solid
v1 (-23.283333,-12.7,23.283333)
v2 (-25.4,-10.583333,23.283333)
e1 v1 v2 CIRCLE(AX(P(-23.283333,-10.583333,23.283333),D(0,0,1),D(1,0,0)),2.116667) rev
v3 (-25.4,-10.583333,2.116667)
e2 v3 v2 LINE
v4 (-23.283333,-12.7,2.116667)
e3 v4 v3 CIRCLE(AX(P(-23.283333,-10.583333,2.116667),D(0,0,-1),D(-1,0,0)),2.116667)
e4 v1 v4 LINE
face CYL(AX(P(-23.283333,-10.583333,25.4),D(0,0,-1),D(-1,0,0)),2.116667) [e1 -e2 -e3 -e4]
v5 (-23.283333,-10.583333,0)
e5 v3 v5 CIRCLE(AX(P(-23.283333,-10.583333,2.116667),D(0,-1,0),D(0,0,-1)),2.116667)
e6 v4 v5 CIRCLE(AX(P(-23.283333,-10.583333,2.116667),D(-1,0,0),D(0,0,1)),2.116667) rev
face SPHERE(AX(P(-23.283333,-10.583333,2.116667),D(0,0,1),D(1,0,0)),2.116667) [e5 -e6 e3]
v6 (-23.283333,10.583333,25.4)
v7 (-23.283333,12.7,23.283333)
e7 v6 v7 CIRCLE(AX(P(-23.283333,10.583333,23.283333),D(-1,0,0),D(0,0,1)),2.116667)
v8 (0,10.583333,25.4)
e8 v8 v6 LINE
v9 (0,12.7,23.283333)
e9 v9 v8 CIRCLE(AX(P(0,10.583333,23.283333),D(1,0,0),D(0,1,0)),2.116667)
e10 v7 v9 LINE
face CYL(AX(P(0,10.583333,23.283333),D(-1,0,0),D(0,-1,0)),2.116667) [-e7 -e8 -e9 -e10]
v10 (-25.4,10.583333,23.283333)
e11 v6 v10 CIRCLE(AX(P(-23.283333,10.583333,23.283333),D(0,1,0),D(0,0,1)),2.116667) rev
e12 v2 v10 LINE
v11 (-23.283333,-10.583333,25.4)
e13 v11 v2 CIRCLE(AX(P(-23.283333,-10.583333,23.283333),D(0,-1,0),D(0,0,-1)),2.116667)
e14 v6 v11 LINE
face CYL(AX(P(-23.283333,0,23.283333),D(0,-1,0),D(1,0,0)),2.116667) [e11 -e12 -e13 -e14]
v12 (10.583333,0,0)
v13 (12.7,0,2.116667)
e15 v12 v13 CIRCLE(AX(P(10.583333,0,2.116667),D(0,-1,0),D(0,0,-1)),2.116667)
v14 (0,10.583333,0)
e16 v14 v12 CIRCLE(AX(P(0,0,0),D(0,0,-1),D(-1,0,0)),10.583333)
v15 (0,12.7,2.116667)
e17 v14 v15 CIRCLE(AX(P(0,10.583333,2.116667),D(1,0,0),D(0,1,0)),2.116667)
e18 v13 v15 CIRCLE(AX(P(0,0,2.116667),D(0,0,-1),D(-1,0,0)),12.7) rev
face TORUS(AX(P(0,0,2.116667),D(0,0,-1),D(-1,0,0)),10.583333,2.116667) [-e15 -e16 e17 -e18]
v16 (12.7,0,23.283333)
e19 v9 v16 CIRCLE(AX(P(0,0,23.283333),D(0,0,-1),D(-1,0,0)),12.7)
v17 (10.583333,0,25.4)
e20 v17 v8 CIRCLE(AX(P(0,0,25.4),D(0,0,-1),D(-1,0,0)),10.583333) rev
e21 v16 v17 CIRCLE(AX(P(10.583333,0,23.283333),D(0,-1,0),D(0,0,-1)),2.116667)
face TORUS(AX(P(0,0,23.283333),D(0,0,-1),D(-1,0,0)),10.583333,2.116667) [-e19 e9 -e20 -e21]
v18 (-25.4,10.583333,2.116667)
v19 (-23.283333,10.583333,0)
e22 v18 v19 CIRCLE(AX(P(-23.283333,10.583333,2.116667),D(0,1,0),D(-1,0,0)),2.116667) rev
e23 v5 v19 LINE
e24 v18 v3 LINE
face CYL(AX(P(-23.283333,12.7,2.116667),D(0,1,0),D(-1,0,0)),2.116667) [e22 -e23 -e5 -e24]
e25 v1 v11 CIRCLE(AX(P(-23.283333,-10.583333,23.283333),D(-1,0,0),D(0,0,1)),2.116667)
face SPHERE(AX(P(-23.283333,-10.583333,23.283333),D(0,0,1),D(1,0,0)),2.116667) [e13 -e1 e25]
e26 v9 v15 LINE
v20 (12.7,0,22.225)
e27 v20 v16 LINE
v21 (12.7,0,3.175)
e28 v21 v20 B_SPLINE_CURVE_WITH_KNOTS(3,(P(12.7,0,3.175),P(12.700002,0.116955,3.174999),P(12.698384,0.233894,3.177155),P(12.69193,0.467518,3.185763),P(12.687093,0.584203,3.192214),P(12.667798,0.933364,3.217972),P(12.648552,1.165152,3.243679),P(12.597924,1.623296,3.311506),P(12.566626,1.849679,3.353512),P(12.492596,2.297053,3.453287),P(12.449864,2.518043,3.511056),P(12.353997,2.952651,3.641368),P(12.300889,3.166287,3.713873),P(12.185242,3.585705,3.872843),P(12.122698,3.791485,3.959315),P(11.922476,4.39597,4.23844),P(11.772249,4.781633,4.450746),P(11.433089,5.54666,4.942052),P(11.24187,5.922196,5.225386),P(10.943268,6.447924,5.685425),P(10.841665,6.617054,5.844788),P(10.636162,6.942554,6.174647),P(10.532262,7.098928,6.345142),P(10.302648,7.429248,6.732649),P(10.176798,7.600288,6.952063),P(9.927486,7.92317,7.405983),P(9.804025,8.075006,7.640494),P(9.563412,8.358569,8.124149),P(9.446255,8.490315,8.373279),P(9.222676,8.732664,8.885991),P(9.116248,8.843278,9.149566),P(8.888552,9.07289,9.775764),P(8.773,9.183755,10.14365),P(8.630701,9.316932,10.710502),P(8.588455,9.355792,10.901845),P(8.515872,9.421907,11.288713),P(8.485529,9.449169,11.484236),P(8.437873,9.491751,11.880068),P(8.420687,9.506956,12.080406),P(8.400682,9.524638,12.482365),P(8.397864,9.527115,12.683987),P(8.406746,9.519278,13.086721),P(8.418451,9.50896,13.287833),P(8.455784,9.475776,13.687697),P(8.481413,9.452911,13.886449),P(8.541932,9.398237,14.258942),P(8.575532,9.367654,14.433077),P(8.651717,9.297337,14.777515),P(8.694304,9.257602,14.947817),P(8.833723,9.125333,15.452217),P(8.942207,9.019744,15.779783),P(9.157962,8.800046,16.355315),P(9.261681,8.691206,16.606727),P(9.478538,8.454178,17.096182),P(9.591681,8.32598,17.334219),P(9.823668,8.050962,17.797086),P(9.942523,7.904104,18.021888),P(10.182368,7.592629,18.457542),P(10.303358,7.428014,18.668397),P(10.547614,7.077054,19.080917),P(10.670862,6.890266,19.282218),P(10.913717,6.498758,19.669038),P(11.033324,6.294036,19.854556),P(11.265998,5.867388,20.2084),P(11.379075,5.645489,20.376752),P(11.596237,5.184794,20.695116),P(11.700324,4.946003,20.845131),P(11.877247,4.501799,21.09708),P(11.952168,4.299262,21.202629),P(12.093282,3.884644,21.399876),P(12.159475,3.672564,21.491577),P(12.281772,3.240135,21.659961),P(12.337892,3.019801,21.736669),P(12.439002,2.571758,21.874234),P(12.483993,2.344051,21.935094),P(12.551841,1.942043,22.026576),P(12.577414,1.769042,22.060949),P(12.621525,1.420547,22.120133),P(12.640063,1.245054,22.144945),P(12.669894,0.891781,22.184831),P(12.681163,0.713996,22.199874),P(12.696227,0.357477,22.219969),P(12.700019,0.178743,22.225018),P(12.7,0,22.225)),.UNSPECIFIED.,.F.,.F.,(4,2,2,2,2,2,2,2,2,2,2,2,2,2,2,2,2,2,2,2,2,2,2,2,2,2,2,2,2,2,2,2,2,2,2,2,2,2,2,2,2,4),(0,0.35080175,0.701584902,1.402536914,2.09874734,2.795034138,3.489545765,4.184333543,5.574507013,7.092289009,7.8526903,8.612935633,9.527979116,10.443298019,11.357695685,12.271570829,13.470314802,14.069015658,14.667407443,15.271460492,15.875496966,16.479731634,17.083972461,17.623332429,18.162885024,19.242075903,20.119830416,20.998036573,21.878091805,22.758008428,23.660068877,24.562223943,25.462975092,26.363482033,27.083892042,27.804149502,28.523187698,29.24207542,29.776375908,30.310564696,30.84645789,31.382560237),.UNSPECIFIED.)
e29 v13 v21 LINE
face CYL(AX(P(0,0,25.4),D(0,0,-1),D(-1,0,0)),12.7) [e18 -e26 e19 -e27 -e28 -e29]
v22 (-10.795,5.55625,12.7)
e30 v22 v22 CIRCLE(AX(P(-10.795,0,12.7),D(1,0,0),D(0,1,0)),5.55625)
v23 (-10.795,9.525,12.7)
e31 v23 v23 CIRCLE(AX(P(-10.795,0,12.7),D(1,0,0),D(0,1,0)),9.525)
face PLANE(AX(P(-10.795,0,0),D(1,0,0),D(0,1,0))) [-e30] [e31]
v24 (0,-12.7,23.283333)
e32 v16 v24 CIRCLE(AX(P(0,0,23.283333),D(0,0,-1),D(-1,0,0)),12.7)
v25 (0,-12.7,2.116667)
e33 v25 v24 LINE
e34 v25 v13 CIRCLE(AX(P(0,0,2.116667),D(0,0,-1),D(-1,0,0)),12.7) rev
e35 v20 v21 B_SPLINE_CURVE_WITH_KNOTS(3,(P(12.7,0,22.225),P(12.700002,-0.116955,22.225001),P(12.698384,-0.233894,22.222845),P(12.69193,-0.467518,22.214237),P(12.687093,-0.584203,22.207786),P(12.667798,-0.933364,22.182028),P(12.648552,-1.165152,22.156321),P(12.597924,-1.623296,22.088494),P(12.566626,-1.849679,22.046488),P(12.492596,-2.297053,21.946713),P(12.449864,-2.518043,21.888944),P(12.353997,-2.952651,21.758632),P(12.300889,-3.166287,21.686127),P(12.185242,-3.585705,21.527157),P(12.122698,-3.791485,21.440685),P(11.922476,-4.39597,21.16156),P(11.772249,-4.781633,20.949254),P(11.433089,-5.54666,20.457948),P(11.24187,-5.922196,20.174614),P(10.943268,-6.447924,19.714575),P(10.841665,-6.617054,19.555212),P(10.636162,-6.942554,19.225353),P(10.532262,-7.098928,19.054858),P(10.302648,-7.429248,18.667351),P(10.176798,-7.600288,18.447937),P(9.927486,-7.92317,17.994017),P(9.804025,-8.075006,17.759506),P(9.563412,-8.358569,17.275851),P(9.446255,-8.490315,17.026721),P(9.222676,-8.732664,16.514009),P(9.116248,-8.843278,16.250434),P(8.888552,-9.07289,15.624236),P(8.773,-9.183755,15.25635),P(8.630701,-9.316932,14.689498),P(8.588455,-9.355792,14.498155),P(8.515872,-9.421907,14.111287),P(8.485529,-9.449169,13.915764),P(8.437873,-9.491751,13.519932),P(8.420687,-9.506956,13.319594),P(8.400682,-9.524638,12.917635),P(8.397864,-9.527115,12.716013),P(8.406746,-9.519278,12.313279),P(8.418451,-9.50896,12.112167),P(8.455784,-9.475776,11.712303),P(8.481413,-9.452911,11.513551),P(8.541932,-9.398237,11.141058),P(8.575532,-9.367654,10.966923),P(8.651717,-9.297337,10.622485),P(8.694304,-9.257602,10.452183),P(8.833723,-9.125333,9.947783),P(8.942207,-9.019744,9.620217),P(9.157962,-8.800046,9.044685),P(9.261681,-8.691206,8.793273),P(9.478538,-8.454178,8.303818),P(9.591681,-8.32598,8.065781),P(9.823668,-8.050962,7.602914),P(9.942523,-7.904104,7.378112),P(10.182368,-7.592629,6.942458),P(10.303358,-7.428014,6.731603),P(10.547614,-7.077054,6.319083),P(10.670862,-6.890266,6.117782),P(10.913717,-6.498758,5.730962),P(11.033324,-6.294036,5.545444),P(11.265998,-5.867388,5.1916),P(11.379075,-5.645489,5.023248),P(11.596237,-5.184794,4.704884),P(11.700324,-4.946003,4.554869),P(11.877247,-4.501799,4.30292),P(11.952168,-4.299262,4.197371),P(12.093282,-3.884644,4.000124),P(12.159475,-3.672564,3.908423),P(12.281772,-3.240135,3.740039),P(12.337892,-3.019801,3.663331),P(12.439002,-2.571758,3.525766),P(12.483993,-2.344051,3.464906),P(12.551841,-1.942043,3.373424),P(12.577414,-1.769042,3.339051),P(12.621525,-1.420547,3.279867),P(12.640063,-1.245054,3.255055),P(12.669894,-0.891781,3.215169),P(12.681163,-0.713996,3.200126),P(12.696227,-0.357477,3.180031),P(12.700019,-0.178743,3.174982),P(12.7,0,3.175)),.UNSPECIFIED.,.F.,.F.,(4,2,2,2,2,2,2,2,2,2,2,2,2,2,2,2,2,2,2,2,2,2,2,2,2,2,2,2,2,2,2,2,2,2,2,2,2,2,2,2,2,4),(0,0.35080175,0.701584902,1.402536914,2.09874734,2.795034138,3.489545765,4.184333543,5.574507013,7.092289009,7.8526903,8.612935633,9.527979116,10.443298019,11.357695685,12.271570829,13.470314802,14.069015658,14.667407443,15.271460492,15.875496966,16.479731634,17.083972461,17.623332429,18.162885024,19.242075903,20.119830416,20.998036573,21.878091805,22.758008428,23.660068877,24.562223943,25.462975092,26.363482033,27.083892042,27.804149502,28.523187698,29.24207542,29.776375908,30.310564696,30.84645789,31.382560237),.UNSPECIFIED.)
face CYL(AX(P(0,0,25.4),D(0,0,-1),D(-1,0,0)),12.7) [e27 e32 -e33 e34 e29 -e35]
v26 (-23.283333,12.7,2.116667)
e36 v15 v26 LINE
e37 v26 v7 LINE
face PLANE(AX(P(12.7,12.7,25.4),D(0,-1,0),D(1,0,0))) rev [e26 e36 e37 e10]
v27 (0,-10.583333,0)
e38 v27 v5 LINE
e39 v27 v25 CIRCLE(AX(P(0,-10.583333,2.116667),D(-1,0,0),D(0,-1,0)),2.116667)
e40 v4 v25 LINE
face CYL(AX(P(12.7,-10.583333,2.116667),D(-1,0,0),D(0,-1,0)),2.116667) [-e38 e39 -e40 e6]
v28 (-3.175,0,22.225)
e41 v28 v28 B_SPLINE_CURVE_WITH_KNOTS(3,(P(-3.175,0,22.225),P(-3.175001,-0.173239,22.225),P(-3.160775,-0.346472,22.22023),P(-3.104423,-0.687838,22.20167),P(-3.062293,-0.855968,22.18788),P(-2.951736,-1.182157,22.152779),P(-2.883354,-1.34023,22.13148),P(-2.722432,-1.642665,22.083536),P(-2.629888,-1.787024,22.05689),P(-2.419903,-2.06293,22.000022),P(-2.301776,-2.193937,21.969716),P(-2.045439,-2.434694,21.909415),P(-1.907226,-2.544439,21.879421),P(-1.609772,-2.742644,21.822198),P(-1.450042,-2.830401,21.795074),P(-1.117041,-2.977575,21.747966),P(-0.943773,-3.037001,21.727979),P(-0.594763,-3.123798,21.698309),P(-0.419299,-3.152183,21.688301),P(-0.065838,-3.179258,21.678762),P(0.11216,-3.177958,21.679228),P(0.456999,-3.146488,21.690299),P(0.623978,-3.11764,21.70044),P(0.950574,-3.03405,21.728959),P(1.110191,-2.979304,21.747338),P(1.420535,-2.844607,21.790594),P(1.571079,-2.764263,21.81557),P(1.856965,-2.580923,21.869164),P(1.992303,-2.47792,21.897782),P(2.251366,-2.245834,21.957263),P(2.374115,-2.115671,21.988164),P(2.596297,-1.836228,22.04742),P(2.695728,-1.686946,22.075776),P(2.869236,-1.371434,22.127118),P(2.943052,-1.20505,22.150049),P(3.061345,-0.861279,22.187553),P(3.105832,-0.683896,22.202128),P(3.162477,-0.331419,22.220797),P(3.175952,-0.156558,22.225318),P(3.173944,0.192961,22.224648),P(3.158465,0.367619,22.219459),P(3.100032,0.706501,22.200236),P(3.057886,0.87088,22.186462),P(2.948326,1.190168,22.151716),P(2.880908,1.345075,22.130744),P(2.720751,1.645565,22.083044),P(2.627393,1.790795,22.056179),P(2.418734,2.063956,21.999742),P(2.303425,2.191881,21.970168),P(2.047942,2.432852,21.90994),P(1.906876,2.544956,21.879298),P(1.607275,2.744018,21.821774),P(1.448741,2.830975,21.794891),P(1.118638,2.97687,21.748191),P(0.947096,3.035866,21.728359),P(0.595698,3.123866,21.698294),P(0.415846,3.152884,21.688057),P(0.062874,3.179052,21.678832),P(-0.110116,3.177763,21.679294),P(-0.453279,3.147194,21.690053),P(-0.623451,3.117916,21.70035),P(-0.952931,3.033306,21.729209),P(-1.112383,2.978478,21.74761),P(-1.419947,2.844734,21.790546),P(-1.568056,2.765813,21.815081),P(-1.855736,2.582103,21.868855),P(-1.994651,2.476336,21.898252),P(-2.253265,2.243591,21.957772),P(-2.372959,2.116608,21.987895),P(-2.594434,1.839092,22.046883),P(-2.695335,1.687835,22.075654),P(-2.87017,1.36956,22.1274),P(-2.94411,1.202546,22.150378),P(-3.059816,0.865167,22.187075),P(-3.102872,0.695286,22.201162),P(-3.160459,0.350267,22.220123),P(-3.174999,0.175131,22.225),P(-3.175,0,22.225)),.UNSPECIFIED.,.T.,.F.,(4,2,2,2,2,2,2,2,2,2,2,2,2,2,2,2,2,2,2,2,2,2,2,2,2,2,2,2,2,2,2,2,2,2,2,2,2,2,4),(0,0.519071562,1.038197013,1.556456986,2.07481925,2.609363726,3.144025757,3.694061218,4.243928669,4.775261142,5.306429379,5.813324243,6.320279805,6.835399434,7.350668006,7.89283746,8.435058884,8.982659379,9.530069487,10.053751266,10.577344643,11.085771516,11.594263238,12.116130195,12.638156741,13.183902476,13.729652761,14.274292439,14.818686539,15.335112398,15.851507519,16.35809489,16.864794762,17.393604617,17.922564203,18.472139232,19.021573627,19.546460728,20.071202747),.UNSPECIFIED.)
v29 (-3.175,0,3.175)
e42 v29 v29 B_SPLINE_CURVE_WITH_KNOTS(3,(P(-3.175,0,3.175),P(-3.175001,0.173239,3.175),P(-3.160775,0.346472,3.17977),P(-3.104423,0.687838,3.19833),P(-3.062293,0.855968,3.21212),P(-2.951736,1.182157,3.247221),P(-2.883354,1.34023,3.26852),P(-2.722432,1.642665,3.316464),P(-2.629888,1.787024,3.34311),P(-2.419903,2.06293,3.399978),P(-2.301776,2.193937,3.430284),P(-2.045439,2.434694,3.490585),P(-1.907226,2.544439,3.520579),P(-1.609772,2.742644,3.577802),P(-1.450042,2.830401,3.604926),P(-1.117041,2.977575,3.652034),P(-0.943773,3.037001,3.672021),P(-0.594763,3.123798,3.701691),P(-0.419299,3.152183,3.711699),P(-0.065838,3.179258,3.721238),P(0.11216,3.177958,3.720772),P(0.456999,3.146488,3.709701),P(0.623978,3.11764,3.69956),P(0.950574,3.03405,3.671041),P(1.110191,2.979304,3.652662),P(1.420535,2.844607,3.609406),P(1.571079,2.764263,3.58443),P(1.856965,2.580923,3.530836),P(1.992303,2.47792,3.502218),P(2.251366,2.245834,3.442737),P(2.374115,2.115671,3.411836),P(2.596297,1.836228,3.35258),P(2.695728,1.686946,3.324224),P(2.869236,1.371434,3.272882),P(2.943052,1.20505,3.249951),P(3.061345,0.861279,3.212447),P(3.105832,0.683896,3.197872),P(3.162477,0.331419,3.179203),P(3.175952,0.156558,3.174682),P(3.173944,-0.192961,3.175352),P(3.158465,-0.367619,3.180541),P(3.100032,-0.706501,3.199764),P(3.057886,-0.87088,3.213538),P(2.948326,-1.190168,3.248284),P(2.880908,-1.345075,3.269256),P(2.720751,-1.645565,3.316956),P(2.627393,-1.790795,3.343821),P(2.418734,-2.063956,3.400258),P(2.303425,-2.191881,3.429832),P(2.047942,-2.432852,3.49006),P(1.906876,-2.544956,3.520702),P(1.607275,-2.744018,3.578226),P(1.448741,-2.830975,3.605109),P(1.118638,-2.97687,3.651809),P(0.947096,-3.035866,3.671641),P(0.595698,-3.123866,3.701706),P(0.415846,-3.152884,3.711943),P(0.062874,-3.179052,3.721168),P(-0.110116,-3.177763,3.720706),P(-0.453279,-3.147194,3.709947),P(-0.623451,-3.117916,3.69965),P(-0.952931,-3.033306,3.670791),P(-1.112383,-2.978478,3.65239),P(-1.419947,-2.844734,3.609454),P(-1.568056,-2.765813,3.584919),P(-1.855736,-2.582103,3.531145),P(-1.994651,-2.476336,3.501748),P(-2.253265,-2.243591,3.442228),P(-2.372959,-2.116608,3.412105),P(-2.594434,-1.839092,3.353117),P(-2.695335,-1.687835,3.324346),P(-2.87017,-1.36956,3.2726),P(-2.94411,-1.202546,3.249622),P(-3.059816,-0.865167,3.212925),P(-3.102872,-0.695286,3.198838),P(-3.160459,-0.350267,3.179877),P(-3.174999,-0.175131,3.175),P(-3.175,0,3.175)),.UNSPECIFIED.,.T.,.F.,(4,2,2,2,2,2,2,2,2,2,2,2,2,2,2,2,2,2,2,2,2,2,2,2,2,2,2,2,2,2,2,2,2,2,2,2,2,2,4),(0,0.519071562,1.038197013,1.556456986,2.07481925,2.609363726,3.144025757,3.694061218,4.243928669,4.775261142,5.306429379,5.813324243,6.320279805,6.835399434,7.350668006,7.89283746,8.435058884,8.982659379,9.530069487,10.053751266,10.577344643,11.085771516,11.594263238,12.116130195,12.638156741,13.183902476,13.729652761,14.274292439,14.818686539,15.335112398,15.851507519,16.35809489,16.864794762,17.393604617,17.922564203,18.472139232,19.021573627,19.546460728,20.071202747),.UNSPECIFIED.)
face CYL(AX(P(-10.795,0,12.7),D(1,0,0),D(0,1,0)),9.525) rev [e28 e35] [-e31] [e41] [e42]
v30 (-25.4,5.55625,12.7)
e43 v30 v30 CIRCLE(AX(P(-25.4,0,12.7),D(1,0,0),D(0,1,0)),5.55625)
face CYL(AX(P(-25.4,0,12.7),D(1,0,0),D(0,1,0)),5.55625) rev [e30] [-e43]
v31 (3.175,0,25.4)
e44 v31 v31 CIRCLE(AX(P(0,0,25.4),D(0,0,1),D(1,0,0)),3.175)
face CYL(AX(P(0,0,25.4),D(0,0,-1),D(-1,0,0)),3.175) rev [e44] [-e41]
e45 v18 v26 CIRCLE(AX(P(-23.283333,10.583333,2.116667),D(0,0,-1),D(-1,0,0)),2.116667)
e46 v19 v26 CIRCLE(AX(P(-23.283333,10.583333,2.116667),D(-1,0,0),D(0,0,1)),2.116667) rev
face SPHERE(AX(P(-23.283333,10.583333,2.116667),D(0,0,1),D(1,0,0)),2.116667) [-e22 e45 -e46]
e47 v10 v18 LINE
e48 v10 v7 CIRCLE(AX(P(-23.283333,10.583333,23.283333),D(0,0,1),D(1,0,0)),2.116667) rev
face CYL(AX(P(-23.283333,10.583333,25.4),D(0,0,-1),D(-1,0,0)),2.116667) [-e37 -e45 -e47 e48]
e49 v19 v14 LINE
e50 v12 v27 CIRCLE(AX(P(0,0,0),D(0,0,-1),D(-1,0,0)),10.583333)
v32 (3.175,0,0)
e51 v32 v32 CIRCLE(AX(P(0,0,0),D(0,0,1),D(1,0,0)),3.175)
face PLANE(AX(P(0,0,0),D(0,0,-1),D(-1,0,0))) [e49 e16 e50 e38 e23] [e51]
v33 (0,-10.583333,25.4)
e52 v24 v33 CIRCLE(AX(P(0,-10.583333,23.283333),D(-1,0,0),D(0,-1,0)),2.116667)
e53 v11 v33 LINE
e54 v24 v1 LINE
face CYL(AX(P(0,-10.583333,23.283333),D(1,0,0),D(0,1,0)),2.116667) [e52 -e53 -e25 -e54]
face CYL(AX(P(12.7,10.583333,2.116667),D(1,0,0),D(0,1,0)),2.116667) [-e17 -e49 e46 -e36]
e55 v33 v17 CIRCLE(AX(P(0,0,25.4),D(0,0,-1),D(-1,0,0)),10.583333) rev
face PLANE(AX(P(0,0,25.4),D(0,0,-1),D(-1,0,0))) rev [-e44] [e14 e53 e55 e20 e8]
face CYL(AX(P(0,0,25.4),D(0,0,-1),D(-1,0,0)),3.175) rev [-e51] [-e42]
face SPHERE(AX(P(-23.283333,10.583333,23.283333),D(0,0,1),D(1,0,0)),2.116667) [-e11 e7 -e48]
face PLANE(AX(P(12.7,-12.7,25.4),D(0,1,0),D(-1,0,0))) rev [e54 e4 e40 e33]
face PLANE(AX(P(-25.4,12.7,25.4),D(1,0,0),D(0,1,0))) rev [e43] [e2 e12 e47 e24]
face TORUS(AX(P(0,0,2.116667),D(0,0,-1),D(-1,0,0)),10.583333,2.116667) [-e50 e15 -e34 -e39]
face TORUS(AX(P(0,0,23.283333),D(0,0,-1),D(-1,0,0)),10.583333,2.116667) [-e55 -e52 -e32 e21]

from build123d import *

# Parameters (mm, degrees)
SKETCH1_W           = 38.1
SKETCH1_H           = 25.4
SKETCH1_R           = 3.175
BOSS_EXTRUDE1_DEPTH = 25.4
SKETCH2_R           = 9.525
SKETCH2_R_2         = 5.55625
CUT_EXTRUDE1_DEPTH  = 23.495
SKETCH2_4_R         = 5.55625
CUT_EXTRUDE2_DEPTH  = 48.519048865
FILLET1_DEPTH       = 25.4
FILLET2_R           = 2.116666667


with BuildPart() as part:
    # Sketch1 → Boss-Extrude1 (new body)
    with BuildSketch(Plane.XY):
        with Locations((-6.35, 0)):
            Rectangle(SKETCH1_W, SKETCH1_H)
        Circle(SKETCH1_R, mode=Mode.SUBTRACT)
    extrude(amount=BOSS_EXTRUDE1_DEPTH)

    # Sketch2 → Cut-Extrude1 (cut)
    # profile 1 of 2: a face of its own
    with BuildSketch(Plane(origin=(12.7, 0, 0), x_dir=(0, 0, -1), z_dir=(1, 0, 0))):
        with Locations(Location((-12.7, 0, 0), (0, 0, 90))):
            Circle(SKETCH2_R)
        with Locations((-12.7, 0)):
            Circle(SKETCH2_R_2, mode=Mode.SUBTRACT)
    # profile 2 of 2: a face of its own
    with BuildSketch(Plane(origin=(12.7, 0, 0), x_dir=(0, 0, -1), z_dir=(1, 0, 0))):
        with Locations((-12.7, 0)):
            Circle(SKETCH2_R_2)
    extrude(amount=-CUT_EXTRUDE1_DEPTH, mode=Mode.SUBTRACT)

    # Sketch2<4> → Cut-Extrude2 (cut, through all)
    with BuildSketch(Plane(origin=(12.7, 0, 0), x_dir=(0, 0, -1), z_dir=(1, 0, 0))):
        with Locations(Location((-12.7, 0, 0), (0, 0, 90))):
            Circle(SKETCH2_4_R)
    extrude(amount=-CUT_EXTRUDE2_DEPTH, mode=Mode.SUBTRACT)

    # Fillet1: read off the stored shape, not the designer's step
    # Fillet1 outline → Fillet1 (cut)
    with BuildSketch(Plane.XY):
        with BuildLine():
            Line((12.7, 12.7), (0, 12.7))
            ThreePointArc((0, 12.7), (8.980256121, 8.980256121), (12.7, 0))
            Line((12.7, 0), (12.7, 12.7))
        make_face()
        with BuildLine():
            Line((12.7, -12.7), (12.7, 0))
            ThreePointArc((12.7, 0), (8.980256121, -8.980256121), (0, -12.7))
            Line((0, -12.7), (12.7, -12.7))
        make_face()
    extrude(amount=FILLET1_DEPTH, mode=Mode.SUBTRACT)

    # Fillet2
    fillet2_edges = [part.edges().sort_by_distance(p)[0] for p in [
        (-25.4, 0, 25.4),
        (-12.7, -12.7, 25.4),
        (-12.7, 12.7, 0),
        (8.980256121, 8.980256121, 0),
        (8.980256121, -8.980256121, 0),
        (-12.7, 12.7, 25.4),
        (8.980256121, 8.980256121, 25.4),
        (8.980256121, -8.980256121, 25.4),
        (-12.7, -12.7, 0),
        (-25.4, 0, 0),
        (-25.4, -12.7, 12.7),
        (-25.4, 12.7, 12.7),
    ]]
    fillet(fillet2_edges, radius=FILLET2_R)


solid = part.part
